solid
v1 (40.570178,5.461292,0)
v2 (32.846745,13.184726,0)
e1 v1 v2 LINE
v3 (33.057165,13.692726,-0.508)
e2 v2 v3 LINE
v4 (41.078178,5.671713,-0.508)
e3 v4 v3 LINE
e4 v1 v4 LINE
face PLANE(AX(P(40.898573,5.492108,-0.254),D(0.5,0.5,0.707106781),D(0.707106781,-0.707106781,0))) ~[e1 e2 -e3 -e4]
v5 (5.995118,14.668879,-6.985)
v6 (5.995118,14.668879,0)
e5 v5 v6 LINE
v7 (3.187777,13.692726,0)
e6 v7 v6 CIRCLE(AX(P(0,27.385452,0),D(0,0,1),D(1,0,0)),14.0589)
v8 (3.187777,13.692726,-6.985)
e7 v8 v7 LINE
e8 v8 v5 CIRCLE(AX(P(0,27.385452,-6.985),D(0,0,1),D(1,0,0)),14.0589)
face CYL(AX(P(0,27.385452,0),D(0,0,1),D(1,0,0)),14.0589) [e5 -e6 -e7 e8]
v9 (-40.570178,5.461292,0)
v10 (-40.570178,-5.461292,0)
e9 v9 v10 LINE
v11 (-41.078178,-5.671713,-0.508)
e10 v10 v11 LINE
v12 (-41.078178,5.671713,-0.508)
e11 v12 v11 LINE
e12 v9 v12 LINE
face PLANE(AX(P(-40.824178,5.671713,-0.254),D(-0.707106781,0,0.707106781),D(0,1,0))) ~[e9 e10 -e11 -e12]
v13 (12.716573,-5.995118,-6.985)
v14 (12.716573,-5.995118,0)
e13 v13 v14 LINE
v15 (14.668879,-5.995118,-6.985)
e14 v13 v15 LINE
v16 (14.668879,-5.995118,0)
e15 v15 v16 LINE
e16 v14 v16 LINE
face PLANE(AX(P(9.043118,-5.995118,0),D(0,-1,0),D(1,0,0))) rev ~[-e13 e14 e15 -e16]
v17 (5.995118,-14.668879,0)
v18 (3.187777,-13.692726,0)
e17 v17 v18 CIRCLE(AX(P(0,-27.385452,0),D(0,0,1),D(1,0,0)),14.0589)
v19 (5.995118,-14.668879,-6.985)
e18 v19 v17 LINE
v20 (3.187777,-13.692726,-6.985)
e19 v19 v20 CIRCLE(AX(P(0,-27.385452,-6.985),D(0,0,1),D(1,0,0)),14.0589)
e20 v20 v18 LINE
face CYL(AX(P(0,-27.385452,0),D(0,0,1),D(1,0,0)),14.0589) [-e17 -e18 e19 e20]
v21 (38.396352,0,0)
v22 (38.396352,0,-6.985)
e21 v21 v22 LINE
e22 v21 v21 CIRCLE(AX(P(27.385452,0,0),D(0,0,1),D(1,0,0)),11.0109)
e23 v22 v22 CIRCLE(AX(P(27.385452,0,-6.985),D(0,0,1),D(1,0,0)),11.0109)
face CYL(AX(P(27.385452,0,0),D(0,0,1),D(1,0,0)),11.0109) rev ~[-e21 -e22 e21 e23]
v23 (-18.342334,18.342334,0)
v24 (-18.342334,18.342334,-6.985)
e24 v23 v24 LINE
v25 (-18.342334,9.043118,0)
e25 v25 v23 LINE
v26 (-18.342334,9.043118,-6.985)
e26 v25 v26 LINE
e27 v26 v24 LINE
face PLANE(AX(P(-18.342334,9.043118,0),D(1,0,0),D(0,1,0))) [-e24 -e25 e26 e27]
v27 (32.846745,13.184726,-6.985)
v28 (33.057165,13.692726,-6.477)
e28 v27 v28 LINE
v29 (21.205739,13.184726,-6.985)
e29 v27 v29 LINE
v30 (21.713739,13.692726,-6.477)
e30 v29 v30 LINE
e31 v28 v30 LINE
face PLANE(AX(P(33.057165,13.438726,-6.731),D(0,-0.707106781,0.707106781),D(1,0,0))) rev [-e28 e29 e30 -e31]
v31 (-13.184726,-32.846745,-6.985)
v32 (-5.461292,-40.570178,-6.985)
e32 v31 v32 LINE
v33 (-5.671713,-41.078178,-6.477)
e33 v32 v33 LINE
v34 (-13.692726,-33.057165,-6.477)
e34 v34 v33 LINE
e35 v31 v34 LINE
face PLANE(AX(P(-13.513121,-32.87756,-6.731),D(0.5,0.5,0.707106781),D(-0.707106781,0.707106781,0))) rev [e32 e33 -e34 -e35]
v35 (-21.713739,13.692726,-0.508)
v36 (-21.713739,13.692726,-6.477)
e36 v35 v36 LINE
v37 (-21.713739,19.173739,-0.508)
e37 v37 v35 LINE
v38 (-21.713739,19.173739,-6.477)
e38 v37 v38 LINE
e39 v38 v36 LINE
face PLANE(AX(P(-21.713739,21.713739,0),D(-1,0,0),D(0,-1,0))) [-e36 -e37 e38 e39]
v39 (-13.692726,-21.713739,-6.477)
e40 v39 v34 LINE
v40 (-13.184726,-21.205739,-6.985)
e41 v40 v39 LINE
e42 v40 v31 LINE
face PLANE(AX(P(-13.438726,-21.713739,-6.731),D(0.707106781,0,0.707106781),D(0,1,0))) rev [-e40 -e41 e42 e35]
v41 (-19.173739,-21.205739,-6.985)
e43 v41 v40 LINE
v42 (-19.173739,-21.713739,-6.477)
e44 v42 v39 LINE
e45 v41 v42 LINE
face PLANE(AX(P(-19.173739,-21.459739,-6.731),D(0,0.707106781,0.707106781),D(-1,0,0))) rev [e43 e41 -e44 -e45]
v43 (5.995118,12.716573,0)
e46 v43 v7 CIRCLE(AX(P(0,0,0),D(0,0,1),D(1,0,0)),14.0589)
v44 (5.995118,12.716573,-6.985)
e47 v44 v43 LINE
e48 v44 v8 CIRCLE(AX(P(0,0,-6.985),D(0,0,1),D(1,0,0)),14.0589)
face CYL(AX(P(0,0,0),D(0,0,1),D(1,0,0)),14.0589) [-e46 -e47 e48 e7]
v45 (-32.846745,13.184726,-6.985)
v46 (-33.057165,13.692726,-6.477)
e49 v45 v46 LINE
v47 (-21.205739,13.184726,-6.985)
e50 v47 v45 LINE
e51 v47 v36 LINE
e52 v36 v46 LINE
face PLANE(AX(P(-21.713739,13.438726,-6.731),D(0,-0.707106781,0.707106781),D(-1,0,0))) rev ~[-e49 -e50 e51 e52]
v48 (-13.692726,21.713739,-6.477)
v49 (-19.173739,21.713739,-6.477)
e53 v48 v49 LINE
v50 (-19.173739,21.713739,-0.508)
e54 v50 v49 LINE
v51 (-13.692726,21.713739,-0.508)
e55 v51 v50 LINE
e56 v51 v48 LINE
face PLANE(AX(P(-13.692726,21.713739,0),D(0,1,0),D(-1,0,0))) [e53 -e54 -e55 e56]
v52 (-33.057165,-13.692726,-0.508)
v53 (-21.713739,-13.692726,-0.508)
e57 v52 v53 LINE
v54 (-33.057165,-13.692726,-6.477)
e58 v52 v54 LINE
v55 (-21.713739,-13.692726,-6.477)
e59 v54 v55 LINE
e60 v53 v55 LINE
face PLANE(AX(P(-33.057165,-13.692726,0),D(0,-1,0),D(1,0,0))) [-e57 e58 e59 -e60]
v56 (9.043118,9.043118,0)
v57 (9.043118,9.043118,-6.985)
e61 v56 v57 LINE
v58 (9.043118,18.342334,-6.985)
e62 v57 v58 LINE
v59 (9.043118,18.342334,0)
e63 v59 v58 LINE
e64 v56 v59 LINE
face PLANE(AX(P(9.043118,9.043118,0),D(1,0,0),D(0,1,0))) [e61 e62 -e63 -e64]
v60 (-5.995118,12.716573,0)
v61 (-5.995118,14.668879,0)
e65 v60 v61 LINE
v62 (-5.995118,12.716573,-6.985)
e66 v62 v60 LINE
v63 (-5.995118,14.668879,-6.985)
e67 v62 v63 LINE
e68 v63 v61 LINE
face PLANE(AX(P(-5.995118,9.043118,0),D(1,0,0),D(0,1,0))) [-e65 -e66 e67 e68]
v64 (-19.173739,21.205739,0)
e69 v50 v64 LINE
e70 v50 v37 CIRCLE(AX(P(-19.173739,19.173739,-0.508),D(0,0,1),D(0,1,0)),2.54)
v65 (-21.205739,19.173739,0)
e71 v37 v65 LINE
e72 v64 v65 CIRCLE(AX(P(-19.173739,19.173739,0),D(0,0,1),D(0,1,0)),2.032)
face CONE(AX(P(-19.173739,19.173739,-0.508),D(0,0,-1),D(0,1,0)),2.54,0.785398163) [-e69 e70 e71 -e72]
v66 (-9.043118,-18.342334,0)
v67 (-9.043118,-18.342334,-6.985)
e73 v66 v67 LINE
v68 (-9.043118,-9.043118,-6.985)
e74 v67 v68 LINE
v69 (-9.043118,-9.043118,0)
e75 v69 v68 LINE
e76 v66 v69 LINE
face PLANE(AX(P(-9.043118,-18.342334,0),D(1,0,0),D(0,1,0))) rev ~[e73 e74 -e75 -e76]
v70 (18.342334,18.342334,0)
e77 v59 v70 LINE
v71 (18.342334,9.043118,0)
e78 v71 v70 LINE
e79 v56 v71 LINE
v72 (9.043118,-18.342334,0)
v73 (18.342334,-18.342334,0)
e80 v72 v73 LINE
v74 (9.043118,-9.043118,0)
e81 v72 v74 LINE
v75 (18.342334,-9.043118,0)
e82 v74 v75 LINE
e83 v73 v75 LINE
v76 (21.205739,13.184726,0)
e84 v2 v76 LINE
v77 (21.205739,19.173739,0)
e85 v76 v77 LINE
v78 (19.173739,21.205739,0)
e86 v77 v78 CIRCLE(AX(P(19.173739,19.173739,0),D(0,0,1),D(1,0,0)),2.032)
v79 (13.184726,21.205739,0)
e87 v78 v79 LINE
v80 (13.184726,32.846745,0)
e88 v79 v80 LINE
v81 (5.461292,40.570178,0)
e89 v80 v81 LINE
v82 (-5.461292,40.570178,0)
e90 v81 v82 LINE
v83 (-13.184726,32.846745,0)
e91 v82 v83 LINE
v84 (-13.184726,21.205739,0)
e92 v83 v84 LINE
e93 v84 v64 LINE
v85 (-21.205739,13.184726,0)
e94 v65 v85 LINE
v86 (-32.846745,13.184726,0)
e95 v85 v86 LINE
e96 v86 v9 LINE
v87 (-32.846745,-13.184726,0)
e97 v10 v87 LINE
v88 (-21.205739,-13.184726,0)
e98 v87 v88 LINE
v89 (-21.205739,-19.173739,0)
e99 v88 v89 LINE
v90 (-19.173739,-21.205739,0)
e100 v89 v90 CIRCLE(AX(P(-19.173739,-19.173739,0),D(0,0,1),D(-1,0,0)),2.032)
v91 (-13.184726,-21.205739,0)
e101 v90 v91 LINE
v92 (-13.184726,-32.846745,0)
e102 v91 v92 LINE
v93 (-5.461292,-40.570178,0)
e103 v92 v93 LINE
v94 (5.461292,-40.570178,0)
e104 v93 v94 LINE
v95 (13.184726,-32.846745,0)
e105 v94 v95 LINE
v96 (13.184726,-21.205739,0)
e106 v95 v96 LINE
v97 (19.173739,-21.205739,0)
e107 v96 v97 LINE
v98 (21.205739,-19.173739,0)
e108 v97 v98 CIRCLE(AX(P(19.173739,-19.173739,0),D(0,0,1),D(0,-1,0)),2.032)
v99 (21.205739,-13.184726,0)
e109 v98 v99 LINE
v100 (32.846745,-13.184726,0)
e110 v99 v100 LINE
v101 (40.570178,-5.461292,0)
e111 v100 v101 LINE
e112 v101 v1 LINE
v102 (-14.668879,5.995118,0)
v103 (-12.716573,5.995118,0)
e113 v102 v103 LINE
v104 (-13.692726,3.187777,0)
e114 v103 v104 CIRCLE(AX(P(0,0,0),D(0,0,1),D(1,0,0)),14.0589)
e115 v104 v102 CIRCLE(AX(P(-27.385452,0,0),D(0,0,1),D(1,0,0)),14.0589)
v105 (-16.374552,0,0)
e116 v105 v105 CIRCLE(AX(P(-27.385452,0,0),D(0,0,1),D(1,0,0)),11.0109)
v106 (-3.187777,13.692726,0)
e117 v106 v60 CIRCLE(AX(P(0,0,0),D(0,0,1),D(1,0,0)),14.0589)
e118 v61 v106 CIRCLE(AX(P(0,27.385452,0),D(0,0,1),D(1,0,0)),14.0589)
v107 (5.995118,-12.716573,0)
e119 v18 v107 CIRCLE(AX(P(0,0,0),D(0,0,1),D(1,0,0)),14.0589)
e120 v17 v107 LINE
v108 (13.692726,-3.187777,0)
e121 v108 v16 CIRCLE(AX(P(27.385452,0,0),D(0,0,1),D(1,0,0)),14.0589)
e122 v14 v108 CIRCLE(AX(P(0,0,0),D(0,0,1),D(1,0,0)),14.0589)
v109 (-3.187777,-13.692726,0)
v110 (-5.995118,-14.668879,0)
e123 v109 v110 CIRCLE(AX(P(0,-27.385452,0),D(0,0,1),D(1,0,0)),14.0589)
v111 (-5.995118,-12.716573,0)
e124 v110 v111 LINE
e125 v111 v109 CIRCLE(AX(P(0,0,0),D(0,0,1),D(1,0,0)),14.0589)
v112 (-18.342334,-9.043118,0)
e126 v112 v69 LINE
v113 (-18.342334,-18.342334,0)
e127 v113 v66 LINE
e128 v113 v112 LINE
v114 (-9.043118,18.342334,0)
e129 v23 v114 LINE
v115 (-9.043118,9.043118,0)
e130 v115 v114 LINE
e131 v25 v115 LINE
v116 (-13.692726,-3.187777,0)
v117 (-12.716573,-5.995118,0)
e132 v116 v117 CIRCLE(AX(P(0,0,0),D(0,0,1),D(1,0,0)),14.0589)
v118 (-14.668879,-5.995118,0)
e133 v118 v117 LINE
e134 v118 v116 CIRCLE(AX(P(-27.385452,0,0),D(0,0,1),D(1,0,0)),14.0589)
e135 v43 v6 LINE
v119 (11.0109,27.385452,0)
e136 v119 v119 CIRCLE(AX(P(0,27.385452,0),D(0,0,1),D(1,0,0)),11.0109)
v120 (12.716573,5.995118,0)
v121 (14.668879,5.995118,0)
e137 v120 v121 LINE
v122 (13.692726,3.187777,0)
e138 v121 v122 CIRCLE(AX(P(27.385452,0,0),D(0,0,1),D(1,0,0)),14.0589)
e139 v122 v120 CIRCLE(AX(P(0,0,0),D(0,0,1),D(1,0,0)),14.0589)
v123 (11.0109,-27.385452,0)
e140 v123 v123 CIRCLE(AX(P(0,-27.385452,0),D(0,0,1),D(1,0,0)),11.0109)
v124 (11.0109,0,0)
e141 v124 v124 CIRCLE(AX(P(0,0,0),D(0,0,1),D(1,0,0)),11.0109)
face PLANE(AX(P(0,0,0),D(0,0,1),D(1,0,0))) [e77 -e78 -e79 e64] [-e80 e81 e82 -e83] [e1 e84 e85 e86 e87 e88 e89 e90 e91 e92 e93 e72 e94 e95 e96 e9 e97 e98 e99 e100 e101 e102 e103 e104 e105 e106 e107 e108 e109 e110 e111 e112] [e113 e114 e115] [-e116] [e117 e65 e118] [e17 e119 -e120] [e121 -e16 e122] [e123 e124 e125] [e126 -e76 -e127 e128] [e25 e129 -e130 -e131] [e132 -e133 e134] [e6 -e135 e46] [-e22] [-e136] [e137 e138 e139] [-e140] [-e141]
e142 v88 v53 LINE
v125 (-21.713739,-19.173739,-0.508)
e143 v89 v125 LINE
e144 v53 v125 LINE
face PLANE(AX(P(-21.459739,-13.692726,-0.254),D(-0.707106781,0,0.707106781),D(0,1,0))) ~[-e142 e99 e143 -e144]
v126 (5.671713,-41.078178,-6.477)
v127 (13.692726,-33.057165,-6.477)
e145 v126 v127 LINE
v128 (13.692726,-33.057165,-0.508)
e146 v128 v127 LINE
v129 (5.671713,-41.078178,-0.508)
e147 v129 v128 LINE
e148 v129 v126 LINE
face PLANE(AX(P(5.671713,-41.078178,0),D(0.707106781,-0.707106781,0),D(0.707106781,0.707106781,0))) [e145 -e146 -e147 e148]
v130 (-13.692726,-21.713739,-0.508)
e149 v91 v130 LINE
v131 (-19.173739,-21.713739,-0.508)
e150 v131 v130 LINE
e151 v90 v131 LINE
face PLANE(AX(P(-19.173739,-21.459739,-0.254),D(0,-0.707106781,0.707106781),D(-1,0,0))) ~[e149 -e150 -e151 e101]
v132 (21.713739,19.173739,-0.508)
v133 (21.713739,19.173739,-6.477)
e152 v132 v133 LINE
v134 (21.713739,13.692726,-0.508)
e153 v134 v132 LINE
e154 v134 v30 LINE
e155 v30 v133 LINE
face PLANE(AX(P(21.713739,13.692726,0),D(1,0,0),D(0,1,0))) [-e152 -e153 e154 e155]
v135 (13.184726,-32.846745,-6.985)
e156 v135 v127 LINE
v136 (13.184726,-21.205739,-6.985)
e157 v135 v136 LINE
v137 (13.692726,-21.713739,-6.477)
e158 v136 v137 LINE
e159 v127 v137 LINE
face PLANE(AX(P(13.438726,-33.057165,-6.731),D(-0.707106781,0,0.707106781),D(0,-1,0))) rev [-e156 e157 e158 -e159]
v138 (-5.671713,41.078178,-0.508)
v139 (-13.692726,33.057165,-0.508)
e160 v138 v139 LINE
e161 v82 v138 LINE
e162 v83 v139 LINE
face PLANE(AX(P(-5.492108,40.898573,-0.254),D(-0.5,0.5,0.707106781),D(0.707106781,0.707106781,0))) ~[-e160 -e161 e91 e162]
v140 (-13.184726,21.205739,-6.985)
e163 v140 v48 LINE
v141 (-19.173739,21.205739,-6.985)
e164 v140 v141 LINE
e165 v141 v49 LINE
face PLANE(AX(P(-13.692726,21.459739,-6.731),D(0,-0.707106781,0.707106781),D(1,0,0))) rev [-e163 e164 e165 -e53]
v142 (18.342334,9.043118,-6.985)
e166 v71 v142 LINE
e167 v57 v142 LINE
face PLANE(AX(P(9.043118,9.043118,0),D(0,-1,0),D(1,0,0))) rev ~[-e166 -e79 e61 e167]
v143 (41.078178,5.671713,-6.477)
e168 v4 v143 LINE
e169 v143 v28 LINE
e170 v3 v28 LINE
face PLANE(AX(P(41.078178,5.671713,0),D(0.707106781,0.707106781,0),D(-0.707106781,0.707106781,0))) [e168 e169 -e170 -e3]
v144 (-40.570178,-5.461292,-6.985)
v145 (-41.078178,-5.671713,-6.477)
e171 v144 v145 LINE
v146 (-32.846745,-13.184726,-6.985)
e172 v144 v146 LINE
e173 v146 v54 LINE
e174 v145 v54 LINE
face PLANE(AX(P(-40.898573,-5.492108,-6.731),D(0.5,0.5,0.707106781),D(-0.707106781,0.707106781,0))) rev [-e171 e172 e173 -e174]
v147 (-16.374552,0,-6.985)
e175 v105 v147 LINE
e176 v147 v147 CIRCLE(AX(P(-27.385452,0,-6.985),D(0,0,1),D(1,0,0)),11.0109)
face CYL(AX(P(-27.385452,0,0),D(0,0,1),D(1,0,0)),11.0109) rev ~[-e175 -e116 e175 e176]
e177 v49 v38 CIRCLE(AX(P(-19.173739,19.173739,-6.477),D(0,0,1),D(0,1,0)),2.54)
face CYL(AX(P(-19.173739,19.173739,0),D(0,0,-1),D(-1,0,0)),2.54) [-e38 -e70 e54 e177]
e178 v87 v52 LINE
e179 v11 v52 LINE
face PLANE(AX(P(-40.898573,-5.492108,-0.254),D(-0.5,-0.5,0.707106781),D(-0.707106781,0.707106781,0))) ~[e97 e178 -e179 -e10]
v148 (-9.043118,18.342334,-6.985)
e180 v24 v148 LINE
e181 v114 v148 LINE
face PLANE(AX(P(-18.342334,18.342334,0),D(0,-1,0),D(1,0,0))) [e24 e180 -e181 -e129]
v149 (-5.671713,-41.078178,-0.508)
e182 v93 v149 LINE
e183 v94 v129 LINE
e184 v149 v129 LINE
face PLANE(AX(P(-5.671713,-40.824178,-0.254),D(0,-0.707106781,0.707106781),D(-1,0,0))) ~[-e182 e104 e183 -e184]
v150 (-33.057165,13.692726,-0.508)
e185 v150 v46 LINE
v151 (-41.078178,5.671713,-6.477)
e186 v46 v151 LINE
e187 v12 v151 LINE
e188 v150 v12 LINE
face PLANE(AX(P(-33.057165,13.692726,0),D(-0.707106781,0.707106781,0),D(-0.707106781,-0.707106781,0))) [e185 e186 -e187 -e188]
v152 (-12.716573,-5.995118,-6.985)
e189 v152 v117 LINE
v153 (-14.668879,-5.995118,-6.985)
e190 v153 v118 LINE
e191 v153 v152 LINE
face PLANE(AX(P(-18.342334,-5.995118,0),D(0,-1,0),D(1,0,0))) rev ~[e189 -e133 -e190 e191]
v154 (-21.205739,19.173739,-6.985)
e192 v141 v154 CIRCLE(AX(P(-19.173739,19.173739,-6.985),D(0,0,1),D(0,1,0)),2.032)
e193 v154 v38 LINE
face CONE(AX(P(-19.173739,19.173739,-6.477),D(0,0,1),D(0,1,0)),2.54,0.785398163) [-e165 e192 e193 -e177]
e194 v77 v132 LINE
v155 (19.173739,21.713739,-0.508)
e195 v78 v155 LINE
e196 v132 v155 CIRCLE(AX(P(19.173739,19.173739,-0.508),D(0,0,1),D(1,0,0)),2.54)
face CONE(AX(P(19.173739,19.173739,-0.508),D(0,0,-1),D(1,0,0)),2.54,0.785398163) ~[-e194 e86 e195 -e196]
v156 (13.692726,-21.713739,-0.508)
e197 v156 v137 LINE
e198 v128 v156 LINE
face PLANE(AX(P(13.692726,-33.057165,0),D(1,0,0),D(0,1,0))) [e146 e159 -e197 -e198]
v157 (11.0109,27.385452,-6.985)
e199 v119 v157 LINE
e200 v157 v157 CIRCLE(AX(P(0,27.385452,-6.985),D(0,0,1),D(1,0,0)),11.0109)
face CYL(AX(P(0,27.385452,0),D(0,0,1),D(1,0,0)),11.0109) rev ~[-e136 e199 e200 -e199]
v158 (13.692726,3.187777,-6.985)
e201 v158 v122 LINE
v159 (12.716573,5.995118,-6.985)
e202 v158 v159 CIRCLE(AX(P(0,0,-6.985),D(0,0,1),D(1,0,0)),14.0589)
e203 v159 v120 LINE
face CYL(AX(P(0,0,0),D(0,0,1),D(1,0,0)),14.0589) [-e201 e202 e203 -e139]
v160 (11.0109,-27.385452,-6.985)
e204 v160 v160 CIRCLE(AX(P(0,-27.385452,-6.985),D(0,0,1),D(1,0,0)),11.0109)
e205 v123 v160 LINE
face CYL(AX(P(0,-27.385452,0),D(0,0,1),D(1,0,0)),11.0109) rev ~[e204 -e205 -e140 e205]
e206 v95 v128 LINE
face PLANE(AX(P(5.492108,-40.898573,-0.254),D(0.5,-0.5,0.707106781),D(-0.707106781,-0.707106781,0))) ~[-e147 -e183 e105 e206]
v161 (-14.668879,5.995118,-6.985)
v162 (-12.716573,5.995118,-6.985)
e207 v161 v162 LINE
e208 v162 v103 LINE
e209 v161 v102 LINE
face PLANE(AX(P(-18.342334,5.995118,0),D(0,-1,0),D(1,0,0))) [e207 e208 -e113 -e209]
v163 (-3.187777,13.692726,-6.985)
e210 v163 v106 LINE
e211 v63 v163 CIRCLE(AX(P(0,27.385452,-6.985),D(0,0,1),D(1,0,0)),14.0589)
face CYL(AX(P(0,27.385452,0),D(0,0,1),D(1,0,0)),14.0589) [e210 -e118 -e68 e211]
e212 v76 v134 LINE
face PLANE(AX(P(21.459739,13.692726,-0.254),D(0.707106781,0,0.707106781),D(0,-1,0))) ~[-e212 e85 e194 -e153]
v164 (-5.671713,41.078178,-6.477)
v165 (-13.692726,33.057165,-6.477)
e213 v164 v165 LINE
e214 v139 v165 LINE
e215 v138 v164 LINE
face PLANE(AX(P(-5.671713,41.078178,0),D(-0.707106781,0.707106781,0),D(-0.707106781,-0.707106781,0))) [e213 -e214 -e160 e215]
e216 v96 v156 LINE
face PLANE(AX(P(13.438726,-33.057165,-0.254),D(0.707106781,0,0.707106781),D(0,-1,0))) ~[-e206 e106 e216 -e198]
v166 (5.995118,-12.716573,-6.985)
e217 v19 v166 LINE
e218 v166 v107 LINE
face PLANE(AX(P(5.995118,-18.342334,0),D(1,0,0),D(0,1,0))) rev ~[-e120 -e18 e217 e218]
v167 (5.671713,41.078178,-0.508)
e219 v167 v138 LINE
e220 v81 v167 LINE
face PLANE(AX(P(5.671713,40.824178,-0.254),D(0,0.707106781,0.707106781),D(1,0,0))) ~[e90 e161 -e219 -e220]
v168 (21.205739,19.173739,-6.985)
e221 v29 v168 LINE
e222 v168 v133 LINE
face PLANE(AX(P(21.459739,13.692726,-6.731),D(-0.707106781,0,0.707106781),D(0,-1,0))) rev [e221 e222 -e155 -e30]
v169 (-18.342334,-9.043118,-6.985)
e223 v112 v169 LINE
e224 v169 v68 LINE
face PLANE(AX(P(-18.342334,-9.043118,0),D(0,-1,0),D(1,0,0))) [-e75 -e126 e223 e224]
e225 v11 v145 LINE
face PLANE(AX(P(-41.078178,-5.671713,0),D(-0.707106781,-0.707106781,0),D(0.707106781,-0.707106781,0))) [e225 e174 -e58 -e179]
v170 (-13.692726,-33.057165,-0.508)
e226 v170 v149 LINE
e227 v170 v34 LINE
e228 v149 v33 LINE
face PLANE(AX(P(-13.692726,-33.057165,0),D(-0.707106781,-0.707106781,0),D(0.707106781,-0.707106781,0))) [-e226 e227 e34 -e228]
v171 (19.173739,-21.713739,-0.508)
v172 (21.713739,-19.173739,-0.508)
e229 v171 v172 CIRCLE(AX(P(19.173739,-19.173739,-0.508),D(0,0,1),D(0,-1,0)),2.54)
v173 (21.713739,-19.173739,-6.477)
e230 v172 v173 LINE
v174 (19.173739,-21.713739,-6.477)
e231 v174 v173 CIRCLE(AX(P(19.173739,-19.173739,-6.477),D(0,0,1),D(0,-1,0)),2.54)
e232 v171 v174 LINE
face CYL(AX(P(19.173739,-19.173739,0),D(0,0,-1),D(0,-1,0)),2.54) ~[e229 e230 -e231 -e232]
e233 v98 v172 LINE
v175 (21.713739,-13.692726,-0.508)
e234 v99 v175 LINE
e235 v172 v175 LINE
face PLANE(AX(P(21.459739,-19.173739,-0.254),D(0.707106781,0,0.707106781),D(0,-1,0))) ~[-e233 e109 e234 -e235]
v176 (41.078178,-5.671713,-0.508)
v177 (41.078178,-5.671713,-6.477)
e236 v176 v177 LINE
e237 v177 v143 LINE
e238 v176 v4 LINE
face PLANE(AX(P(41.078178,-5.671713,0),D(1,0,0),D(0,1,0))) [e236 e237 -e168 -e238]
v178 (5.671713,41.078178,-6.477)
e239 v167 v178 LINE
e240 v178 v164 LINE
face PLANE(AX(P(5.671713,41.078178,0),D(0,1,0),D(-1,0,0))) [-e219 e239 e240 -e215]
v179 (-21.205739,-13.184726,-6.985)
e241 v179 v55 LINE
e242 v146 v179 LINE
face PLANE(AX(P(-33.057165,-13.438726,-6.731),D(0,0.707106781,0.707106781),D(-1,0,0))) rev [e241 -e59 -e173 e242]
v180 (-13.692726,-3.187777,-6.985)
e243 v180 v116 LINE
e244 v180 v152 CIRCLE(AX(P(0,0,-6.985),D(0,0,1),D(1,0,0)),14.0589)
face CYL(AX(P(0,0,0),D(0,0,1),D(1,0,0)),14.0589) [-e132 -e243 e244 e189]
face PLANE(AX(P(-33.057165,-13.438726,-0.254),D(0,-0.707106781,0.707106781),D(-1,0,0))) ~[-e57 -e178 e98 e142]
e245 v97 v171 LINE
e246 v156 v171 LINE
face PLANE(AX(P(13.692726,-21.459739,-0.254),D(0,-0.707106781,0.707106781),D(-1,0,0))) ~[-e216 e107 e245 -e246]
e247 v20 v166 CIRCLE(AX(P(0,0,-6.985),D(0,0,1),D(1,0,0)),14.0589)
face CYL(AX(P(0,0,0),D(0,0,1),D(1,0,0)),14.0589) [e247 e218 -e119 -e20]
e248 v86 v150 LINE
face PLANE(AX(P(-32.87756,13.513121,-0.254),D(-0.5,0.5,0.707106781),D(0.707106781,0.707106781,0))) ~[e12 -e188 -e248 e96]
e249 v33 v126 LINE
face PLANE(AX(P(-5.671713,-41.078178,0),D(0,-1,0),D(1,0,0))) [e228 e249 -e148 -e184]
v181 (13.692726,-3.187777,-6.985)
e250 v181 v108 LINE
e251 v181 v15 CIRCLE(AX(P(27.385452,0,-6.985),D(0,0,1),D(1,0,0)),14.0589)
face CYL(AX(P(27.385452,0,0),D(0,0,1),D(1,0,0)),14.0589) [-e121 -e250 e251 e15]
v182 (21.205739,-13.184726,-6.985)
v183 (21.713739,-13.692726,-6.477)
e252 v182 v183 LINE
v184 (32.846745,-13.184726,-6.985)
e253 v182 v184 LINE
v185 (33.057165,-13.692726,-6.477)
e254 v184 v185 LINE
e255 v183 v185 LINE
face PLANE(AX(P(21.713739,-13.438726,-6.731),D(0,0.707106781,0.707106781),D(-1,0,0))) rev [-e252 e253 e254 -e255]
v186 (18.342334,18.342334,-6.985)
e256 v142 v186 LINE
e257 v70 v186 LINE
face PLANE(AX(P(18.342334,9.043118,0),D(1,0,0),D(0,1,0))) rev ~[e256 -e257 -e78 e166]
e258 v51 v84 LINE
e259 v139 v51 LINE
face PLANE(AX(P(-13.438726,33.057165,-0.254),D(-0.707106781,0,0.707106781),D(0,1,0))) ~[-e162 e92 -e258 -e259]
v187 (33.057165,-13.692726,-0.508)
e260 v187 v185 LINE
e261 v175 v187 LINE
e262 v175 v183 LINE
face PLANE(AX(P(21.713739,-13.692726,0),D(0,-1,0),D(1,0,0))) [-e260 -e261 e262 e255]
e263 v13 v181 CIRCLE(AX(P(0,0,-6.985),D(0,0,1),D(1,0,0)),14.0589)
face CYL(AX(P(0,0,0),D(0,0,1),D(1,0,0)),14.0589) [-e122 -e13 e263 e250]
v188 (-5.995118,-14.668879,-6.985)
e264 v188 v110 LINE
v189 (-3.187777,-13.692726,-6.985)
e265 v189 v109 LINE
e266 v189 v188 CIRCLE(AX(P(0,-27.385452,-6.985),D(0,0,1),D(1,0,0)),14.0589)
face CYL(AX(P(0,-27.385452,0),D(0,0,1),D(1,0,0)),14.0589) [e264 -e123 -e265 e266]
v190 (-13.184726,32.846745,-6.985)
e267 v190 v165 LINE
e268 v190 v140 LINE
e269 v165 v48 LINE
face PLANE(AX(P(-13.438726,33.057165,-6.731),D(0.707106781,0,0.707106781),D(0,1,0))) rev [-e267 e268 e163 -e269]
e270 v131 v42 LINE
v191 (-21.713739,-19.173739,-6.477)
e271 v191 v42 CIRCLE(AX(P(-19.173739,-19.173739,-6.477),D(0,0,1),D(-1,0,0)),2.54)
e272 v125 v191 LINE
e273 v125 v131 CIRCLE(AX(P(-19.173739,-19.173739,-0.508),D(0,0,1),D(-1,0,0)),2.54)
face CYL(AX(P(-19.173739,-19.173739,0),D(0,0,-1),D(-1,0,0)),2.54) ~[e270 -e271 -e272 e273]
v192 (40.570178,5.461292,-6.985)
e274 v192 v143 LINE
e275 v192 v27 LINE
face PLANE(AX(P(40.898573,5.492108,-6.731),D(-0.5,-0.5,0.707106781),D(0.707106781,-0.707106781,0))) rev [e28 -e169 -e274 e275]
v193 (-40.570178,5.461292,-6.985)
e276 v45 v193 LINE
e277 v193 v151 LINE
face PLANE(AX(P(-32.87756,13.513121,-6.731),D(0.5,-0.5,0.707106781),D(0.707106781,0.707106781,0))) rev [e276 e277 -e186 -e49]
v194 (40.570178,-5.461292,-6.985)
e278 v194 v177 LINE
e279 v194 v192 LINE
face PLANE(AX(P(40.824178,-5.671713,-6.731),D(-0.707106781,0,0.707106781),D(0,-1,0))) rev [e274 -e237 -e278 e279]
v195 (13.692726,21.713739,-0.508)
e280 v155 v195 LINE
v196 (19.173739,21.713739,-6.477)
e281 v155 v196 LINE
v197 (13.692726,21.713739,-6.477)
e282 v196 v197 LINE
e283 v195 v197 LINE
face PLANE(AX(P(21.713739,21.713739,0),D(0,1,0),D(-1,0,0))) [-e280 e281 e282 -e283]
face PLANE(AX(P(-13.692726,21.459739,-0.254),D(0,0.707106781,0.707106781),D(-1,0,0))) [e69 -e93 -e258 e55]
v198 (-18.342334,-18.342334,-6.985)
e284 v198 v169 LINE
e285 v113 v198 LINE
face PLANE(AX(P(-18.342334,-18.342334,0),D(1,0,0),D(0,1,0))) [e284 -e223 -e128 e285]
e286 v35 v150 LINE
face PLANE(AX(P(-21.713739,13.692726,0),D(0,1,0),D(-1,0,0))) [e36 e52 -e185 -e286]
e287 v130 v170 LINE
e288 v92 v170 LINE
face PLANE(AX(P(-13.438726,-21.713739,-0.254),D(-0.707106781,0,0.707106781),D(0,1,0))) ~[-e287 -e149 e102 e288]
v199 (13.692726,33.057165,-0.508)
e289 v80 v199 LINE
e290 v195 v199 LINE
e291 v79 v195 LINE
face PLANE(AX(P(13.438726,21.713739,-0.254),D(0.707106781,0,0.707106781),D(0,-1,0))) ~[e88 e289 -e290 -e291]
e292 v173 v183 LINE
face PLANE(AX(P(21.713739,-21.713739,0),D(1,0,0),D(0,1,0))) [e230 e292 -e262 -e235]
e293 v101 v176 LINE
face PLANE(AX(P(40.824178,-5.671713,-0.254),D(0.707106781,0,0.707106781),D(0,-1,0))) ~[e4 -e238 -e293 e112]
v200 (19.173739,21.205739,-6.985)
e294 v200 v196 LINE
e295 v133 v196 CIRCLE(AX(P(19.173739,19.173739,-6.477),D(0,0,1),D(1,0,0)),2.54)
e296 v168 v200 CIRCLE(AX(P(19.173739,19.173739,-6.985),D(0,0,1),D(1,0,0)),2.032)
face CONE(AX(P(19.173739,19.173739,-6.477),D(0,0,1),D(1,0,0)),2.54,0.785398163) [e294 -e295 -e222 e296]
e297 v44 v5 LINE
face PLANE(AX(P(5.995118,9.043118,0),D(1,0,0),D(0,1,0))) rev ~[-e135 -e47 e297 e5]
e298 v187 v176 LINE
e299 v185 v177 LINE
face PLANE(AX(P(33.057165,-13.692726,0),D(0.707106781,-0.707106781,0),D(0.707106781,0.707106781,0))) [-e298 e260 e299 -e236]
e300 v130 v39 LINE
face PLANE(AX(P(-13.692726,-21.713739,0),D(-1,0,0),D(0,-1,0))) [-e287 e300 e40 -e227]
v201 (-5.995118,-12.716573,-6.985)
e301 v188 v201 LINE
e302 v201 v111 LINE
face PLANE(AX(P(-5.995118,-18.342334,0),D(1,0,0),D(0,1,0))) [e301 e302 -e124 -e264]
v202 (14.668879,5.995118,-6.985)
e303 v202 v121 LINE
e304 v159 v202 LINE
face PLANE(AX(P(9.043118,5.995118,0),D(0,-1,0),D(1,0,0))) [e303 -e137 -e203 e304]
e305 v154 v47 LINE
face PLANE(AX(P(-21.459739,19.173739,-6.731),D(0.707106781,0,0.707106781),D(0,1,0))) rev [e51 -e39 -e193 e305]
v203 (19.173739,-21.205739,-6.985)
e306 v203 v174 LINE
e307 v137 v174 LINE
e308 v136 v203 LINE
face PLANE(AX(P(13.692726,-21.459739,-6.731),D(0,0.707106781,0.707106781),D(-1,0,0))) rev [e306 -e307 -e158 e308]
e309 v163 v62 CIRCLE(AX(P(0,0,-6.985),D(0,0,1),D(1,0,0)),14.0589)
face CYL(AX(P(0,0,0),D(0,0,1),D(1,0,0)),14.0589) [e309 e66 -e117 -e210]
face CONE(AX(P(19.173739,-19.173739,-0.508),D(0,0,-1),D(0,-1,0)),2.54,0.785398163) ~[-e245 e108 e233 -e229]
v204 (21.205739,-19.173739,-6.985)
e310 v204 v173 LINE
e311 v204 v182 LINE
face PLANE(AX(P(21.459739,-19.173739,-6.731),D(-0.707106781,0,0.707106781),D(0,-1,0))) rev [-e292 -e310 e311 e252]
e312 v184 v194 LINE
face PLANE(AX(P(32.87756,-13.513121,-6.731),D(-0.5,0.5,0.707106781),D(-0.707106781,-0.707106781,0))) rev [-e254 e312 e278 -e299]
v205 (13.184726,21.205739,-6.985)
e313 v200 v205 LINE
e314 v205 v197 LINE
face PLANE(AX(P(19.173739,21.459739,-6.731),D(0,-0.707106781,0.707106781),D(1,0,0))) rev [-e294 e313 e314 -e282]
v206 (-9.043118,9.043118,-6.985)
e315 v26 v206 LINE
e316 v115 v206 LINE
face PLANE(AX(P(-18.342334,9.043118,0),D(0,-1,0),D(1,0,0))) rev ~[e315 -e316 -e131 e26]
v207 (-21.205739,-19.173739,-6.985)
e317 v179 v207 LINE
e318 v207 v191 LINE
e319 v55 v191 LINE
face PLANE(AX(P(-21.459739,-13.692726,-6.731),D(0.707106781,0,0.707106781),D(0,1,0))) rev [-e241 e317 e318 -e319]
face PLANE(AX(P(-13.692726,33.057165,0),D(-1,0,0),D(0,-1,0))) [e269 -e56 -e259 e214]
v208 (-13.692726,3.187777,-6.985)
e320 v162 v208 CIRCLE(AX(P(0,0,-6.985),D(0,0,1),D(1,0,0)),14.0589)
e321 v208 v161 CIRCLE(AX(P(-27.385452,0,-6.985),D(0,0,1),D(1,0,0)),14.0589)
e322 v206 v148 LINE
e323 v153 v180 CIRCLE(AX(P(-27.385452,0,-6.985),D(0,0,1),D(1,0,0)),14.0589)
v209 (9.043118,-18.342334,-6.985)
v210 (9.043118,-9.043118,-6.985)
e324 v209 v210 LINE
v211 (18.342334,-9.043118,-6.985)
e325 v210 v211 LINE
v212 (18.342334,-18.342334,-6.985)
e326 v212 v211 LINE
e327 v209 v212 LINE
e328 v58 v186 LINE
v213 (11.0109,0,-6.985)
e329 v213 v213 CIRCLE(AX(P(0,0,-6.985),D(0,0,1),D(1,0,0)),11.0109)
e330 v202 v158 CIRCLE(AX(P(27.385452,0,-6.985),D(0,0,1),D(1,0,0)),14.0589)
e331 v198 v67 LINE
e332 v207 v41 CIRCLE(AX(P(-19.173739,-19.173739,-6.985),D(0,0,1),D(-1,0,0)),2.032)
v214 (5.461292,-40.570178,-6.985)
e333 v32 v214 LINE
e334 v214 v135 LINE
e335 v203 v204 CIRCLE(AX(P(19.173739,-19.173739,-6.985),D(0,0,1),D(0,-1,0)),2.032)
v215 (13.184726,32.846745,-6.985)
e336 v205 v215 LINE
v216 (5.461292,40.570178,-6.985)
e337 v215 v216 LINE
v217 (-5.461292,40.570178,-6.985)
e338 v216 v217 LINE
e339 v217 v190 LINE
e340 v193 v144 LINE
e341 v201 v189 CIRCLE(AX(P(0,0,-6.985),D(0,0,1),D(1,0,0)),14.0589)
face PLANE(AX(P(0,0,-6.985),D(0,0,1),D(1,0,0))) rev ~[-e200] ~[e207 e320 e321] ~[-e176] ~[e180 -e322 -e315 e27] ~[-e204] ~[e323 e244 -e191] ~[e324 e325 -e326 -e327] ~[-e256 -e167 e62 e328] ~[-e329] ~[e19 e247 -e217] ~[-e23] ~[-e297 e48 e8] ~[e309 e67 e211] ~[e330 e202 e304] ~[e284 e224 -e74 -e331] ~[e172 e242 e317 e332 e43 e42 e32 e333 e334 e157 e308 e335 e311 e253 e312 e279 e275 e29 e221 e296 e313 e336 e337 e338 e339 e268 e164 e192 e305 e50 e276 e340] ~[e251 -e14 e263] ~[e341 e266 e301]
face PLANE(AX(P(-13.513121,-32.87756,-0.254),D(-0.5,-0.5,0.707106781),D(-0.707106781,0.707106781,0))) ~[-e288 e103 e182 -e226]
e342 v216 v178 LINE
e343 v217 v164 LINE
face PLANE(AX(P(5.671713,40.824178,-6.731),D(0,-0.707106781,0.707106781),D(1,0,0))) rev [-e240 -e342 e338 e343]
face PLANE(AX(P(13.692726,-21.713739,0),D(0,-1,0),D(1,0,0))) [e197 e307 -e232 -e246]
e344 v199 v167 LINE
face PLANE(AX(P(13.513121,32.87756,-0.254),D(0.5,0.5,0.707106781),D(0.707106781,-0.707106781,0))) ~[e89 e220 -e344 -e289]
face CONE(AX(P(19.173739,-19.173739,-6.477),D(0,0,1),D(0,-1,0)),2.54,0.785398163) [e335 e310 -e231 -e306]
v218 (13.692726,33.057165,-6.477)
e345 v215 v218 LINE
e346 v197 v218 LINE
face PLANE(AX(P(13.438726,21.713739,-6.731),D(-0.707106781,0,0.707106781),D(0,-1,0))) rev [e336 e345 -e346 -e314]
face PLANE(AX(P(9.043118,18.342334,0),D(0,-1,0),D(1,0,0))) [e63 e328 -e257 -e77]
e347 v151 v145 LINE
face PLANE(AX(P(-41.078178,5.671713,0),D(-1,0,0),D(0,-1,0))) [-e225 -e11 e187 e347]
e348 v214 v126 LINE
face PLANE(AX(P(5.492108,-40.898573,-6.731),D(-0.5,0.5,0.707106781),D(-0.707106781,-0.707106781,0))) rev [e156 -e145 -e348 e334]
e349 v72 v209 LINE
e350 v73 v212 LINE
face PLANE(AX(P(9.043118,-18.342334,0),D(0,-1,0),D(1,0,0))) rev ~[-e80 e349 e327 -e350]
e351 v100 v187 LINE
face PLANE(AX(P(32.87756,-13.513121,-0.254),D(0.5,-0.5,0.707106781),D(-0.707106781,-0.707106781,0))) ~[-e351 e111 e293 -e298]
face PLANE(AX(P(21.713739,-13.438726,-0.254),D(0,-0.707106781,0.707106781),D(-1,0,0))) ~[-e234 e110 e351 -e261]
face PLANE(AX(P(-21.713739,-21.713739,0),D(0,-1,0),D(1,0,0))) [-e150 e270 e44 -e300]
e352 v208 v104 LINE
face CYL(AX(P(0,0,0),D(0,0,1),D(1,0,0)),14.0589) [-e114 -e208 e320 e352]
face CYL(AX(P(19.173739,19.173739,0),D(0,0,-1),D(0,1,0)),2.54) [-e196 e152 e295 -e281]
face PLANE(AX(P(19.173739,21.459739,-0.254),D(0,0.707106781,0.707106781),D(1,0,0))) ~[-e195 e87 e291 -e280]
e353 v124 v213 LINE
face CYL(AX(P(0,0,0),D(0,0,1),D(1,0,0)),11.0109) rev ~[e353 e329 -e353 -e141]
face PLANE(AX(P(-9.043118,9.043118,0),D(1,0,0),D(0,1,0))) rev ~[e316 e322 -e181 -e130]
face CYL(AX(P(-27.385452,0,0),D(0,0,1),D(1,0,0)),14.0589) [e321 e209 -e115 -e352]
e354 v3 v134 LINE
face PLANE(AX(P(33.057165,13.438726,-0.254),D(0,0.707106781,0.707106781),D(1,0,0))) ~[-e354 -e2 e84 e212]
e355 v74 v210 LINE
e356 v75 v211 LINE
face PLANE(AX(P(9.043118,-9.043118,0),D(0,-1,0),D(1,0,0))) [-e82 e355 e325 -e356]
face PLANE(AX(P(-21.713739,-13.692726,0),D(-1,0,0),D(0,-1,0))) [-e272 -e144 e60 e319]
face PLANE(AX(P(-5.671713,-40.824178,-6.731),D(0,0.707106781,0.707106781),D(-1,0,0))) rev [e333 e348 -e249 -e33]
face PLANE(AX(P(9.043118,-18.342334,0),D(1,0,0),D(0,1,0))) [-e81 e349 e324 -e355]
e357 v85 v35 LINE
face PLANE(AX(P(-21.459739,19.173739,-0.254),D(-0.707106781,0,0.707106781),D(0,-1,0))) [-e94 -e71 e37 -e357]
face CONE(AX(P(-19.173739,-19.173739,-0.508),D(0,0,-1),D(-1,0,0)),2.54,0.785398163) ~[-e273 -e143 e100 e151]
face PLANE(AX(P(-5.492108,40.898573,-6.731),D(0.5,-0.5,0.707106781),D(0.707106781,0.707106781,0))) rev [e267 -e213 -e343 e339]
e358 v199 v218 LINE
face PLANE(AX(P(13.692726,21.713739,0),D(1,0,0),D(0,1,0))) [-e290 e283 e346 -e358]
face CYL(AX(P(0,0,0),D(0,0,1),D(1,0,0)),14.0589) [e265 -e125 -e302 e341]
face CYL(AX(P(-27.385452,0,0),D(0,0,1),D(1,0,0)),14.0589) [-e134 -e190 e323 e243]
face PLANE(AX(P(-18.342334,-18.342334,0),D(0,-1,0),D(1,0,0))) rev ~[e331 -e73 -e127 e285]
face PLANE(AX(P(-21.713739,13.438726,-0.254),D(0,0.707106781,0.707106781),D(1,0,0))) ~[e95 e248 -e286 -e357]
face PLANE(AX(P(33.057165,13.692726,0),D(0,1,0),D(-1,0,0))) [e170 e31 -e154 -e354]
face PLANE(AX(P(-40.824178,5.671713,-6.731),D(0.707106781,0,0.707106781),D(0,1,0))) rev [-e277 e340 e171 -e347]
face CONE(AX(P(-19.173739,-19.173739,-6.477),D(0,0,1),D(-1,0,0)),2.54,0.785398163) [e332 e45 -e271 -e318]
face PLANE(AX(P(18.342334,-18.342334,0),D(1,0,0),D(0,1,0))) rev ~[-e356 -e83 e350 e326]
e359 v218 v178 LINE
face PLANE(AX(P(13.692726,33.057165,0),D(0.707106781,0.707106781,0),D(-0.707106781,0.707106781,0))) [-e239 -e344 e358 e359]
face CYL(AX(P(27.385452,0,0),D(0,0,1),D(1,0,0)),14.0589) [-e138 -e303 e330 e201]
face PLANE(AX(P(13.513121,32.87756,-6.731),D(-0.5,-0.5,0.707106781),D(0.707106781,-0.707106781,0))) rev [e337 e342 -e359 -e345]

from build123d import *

# Parameters (mm, degrees)
F0_R         = 11.0109
F1_DEPTH     = 6.985
F2_W         = 9.299216499
F2_H         = 9.299216499
F3_DEPTH     = 25.4
F4_R         = 2.54
F5_SIZE      = 0.508
F6_SIZE      = 0.508
F7_T         = 3.048
F7_T3_DEPTH  = 12.065
F7_T5_DEPTH  = 6.9758818102
F7_T7_DEPTH  = 6.9758818102
F7_T9_DEPTH  = 6.9758818102
F7_T11_DEPTH = 6.9758818102
F7_T13_DEPTH = 6.9758818102
F7_T15_DEPTH = 13.081
F7_T17_DEPTH = 6.9758818102
F7_T19_DEPTH = 6.9758818102
F7_T21_DEPTH = 6.9758818102


# Not quite as in the source:
# - a shell that OpenCascade refuses in one call is made with other operations: the cavity is built on its own and cut out


with BuildPart() as f1:
    # F0 (on Top) → F1 (new body)
    with BuildSketch(Plane.XY):
        Polygon((-13.6927261634, 5.6717128827), (-13.6927261634, -5.6717128827), (-21.7137394441, -13.6927261634), (-21.7137394441, -21.7137394441), (-13.6927261634, -21.7137394441), (-5.6717128827, -13.6927261634), (5.6717128827, -13.6927261634), (13.6927261634, -21.7137394441), (21.7137394441, -21.7137394441), (21.7137394441, -13.6927261634), (13.6927261634, -5.6717128827), (13.6927261634, 5.6717128827), (21.7137394441, 13.6927261634), (21.7137394441, 21.7137394441), (13.6927261634, 21.7137394441), (5.6717128827, 13.6927261634), (-5.6717128827, 13.6927261634), (-13.6927261634, 21.7137394441), (-21.7137394441, 21.7137394441), (-21.7137394441, 13.6927261634), align=None)
        Circle(F0_R, mode=Mode.SUBTRACT)
        Polygon((-21.7137394441, -13.6927261634), (-13.6927261634, -5.6717128827), (-13.6927261634, 5.6717128827), (-21.7137394441, 13.6927261634), (-33.0571652095, 13.6927261634), (-41.0781784902, 5.6717128827), (-41.0781784902, -5.6717128827), (-33.0571652095, -13.6927261634), align=None)
        with Locations((-27.3854523268, 0)):
            Circle(F0_R, mode=Mode.SUBTRACT)
        Polygon((-5.6717128827, -13.6927261634), (-13.6927261634, -21.7137394441), (-13.6927261634, -33.0571652095), (-5.6717128827, -41.0781784902), (5.6717128827, -41.0781784902), (13.6927261634, -33.0571652095), (13.6927261634, -21.7137394441), (5.6717128827, -13.6927261634), align=None)
        with Locations((0, -27.3854523268)):
            Circle(F0_R, mode=Mode.SUBTRACT)
        Polygon((-13.6927261634, 33.0571652095), (-13.6927261634, 21.7137394441), (-5.6717128827, 13.6927261634), (5.6717128827, 13.6927261634), (13.6927261634, 21.7137394441), (13.6927261634, 33.0571652095), (5.6717128827, 41.0781784902), (-5.6717128827, 41.0781784902), align=None)
        with Locations((0, 27.3854523268)):
            Circle(F0_R, mode=Mode.SUBTRACT)
        Polygon((13.6927261634, -5.6717128827), (21.7137394441, -13.6927261634), (33.0571652095, -13.6927261634), (41.0781784902, -5.6717128827), (41.0781784902, 5.6717128827), (33.0571652095, 13.6927261634), (21.7137394441, 13.6927261634), (13.6927261634, 5.6717128827), align=None)
        with Locations((27.3854523268, 0)):
            Circle(F0_R, mode=Mode.SUBTRACT)
    extrude(amount=-F1_DEPTH)

    # F2 (on Top) → F3 (cut)
    with BuildSketch(Plane.XY):
        with Locations((-13.6927261634, 13.6927261634)):
            Rectangle(F2_W, F2_H)
        with Locations((13.6927261634, 13.6927261634)):
            Rectangle(F2_W, F2_H)
        with Locations((13.6927261634, -13.6927261634)):
            Rectangle(F2_W, F2_H)
        with Locations((-13.6927261634, -13.6927261634)):
            Rectangle(F2_W, F2_H)
    extrude(amount=-F3_DEPTH, mode=Mode.SUBTRACT)

    # F4
    f4_edges = [f1.edges().sort_by_distance(p)[0] for p in [
        (-21.713739, 21.713739, -3.4925),
        (21.713739, 21.713739, -3.4925),
        (21.713739, -21.713739, -3.4925),
        (-21.713739, -21.713739, -3.4925),
    ]]
    fillet(f4_edges, radius=F4_R)

    # F5
    f5_edges = [f1.edges().sort_by_distance(p)[0] for p in [
        (41.078178, 0, -6.985),
        (37.067672, 9.68222, -6.985),
        (27.385452, 13.692726, -6.985),
        (21.713739, 16.433233, -6.985),
        (16.433233, 21.713739, -6.985),
        (13.692726, 27.385452, -6.985),
        (9.68222, 37.067672, -6.985),
        (0, 41.078178, -6.985),
        (-9.68222, 37.067672, -6.985),
        (-13.692726, 27.385452, -6.985),
        (-16.433233, 21.713739, -6.985),
        (37.067672, -9.68222, -6.985),
        (27.385452, -13.692726, -6.985),
        (21.713739, -16.433233, -6.985),
        (16.433233, -21.713739, -6.985),
        (13.692726, -27.385452, -6.985),
        (9.68222, -37.067672, -6.985),
        (0, -41.078178, -6.985),
        (-9.68222, -37.067672, -6.985),
        (-13.692726, -27.385452, -6.985),
        (-16.433233, -21.713739, -6.985),
        (-21.713739, -16.433233, -6.985),
        (-27.385452, -13.692726, -6.985),
        (-37.067672, -9.68222, -6.985),
        (-41.078178, 0, -6.985),
        (-37.067672, 9.68222, -6.985),
        (-27.385452, 13.692726, -6.985),
        (-21.713739, 16.433233, -6.985),
    ]]
    chamfer(f5_edges, length=F5_SIZE)

    # F6
    f6_edges = [f1.edges().sort_by_distance(p)[0] for p in [
        (9.68222, -37.067672, 0),
        (0, -41.078178, 0),
        (-9.68222, -37.067672, 0),
        (-13.692726, -27.385452, 0),
        (-16.433233, -21.713739, 0),
        (-21.713739, -16.433233, 0),
        (-27.385452, -13.692726, 0),
        (-37.067672, -9.68222, 0),
        (-27.385452, 13.692726, 0),
        (-37.067672, 9.68222, 0),
        (-41.078178, 0, 0),
        (-21.713739, 16.433233, 0),
        (-16.433233, 21.713739, 0),
        (-13.692726, 27.385452, 0),
        (-9.68222, 37.067672, 0),
        (0, 41.078178, 0),
        (9.68222, 37.067672, 0),
        (13.692726, 27.385452, 0),
        (16.433233, 21.713739, 0),
        (21.713739, 16.433233, 0),
        (27.385452, 13.692726, 0),
        (37.067672, 9.68222, 0),
        (41.078178, 0, 0),
        (37.067672, -9.68222, 0),
        (27.385452, -13.692726, 0),
        (21.713739, -16.433233, 0),
        (16.433233, -21.713739, 0),
        (13.692726, -27.385452, 0),
    ]]
    chamfer(f6_edges, length=F6_SIZE)

    # F7: shell of thickness 3.048, made by hand


with BuildPart() as f7_core1:
    # F7_t2: copy of F1
    add(f1.part)

    # the walls: a layer under each face that stays
    f7_faces = [f7_core1.faces().sort_by_distance(p)[0] for p in [
        (21.7137394441, 16.4332328037, -3.4925),
        (21.4597394441, 16.1792328037, -0.254),
        (21.4597394441, 16.1792328037, -6.731),
        (27.3854523268, 13.6927261634, -3.4925),
        (20.7901855458, 20.7901855458, -0.254),
        (20.7901855458, 20.7901855458, -6.731),
        (16.4332328037, 21.7137394441, -3.4925),
        (27.1314523268, 13.4387261634, -0.254),
        (27.1314523268, 13.4387261634, -6.731),
        (37.0676718499, 9.6822195231, -3.4925),
        (16.1792328037, 21.4597394441, -0.254),
        (16.1792328037, 21.4597394441, -6.731),
        (13.6927261634, 27.3854523268, -3.4925),
        (36.8880667274, 9.5026144006, -0.254),
        (9.5026144006, -36.8880667274, -0.254),
        (0, -40.8241784902, -0.254),
        (13.4387261634, -27.1314523268, -0.254),
        (-9.5026144006, -36.8880667274, -0.254),
        (16.1792328037, -21.4597394441, -0.254),
        (-13.4387261634, -27.1314523268, -0.254),
        (20.7901855458, -20.7901855458, -0.254),
        (-16.1792328037, -21.4597394441, -0.254),
        (21.4597394441, -16.1792328037, -0.254),
        (-20.7901855458, -20.7901855458, -0.254),
        (27.1314523268, -13.4387261634, -0.254),
        (-21.4597394441, -16.1792328037, -0.254),
        (36.8880667274, -9.5026144006, -0.254),
        (-27.1314523268, -13.4387261634, -0.254),
        (40.8241784902, 0, -0.254),
        (-36.8880667274, -9.5026144006, -0.254),
        (-40.8241784902, 0, -0.254),
        (-36.8880667274, 9.5026144006, -0.254),
        (-27.1314523268, 13.4387261634, -0.254),
        (-21.4597394441, 16.1792328037, -0.254),
        (-20.7901855458, 20.7901855458, -0.254),
        (13.4387261634, 27.1314523268, -0.254),
        (-16.1792328037, 21.4597394441, -0.254),
        (9.5026144006, 36.8880667274, -0.254),
        (-13.4387261634, 27.1314523268, -0.254),
        (0, 40.8241784902, -0.254),
        (-9.5026144006, 36.8880667274, -0.254),
        (-9.0431179139, -13.6927261634, -3.4925),
        (-13.6927261634, -9.0431179139, -3.4925),
        (-18.3423344129, -13.6927261634, -3.4925),
        (-13.6927261634, -18.3423344129, -3.4925),
        (-11.0109, -27.3854523268, -3.4925),
        (18.3423344129, -13.6927261634, -3.4925),
        (13.6927261634, -9.0431179139, -3.4925),
        (9.0431179139, -13.6927261634, -3.4925),
        (13.6927261634, -18.3423344129, -3.4925),
        (-38.3963523268, 0, -3.4925),
        (-13.6927261634, 18.3423344129, -3.4925),
        (-18.3423344129, 13.6927261634, -3.4925),
        (-13.6927261634, 9.0431179139, -3.4925),
        (-9.0431179139, 13.6927261634, -3.4925),
        (-11.0109, 0, -3.4925),
        (9.0431179139, 13.6927261634, -3.4925),
        (13.6927261634, 9.0431179139, -3.4925),
        (18.3423344129, 13.6927261634, -3.4925),
        (13.6927261634, 18.3423344129, -3.4925),
        (16.3745523268, 0, -3.4925),
        (-11.0109, 27.3854523268, -3.4925),
        (36.8880667274, 9.5026144006, -6.731),
        (40.8241784902, 0, -6.731),
        (36.8880667274, -9.5026144006, -6.731),
        (27.1314523268, -13.4387261634, -6.731),
        (21.4597394441, -16.1792328037, -6.731),
        (20.7901855458, -20.7901855458, -6.731),
        (16.1792328037, -21.4597394441, -6.731),
        (13.4387261634, -27.1314523268, -6.731),
        (13.4387261634, 27.1314523268, -6.731),
        (9.5026144006, -36.8880667274, -6.731),
        (9.5026144006, 36.8880667274, -6.731),
        (0, -40.8241784902, -6.731),
        (0, 40.8241784902, -6.731),
        (-9.5026144006, -36.8880667274, -6.731),
        (-9.5026144006, 36.8880667274, -6.731),
        (-13.4387261634, -27.1314523268, -6.731),
        (-13.4387261634, 27.1314523268, -6.731),
        (-16.1792328037, -21.4597394441, -6.731),
        (-16.1792328037, 21.4597394441, -6.731),
        (-20.7901855458, -20.7901855458, -6.731),
        (-20.7901855458, 20.7901855458, -6.731),
        (-21.4597394441, -16.1792328037, -6.731),
        (-21.4597394441, 16.1792328037, -6.731),
        (-27.1314523268, -13.4387261634, -6.731),
        (-27.1314523268, 13.4387261634, -6.731),
        (-36.8880667274, -9.5026144006, -6.731),
        (-36.8880667274, 9.5026144006, -6.731),
        (-40.8241784902, 0, -6.731),
        (41.0781784902, 0, -3.4925),
        (9.6822195231, 37.0676718499, -3.4925),
        (9.6822195231, -37.0676718499, -3.4925),
        (0, -41.0781784902, -3.4925),
        (13.6927261634, -27.3854523268, -3.4925),
        (-9.6822195231, -37.0676718499, -3.4925),
        (16.4332328037, -21.7137394441, -3.4925),
        (-13.6927261634, -27.3854523268, -3.4925),
        (-16.4332328037, -21.7137394441, -3.4925),
        (21.7137394441, -16.4332328037, -3.4925),
        (27.3854523268, -13.6927261634, -3.4925),
        (-21.7137394441, -16.4332328037, -3.4925),
        (37.0676718499, -9.6822195231, -3.4925),
        (-27.3854523268, -13.6927261634, -3.4925),
        (-37.0676718499, -9.6822195231, -3.4925),
        (-41.0781784902, 0, -3.4925),
        (-37.0676718499, 9.6822195231, -3.4925),
        (-27.3854523268, 13.6927261634, -3.4925),
        (-21.7137394441, 16.4332328037, -3.4925),
        (-16.4332328037, 21.7137394441, -3.4925),
        (-13.6927261634, 27.3854523268, -3.4925),
        (0, 41.0781784902, -3.4925),
        (-9.6822195231, 37.0676718499, -3.4925),
    ]]
    thicken(f7_faces, amount=-F7_T, mode=Mode.SUBTRACT)

    # F7_s4 → F7_t3 (cut)
    with BuildSketch(Plane.XY.offset(-9.525)):
        Polygon((21.7442194441, 13.7232061634), (18.6657394441, 13.6927261634), (18.6657394441, 10.6447261634), (21.7137394441, 10.6447261634), align=None)
        Polygon((13.7232061634, 21.7442194441), (13.6927261634, 18.6657394441), (10.6447261634, 18.6657394441), (10.6447261634, 21.7137394441), align=None)
        Polygon((13.7232061634, -21.7442194441), (10.6447261634, -21.7137394441), (10.6447261634, -18.6657394441), (13.6927261634, -18.6657394441), align=None)
        Polygon((-13.7232061634, -21.7442194441), (-10.6447261634, -21.7137394441), (-10.6447261634, -18.6657394441), (-13.6927261634, -18.6657394441), align=None)
        Polygon((21.7442194441, -13.7232061634), (18.6657394441, -13.6927261634), (18.6657394441, -10.6447261634), (21.7137394441, -10.6447261634), align=None)
        Polygon((-21.7442194441, -13.7232061634), (-18.6657394441, -13.6927261634), (-18.6657394441, -10.6447261634), (-21.7137394441, -10.6447261634), align=None)
        Polygon((-21.7442194441, 13.7232061634), (-21.7137394441, 10.6447261634), (-18.6657394441, 10.6447261634), (-18.6657394441, 13.6927261634), align=None)
        Polygon((-13.7232061634, 21.7442194441), (-13.6927261634, 18.6657394441), (-10.6447261634, 18.6657394441), (-10.6447261634, 21.7137394441), align=None)
    extrude(amount=F7_T3_DEPTH, mode=Mode.SUBTRACT)

    # F7_s6 → F7_t5 (cut)
    with BuildSketch(Plane(origin=(9.7037249153, 9.7037249153, -9.7037249153), x_dir=(-0.7071067812, 0.7071067812, 0), z_dir=(0.5773502692, 0.5773502692, -0.5773502692))):
        Polygon((-5.6717128827, 14.0926417011), (-4.1477128827, 11.4002033618), (-5.6717128827, 10.5203215515), (-7.1957128827, 11.4002033618), align=None)
        Polygon((5.6717128827, 14.0926417011), (4.1477128827, 11.4002033618), (5.6717128827, 10.5203215515), (7.1957128827, 11.4002033618), align=None)
    extrude(amount=F7_T5_DEPTH, mode=Mode.SUBTRACT)

    # F7_s8 → F7_t7 (cut)
    with BuildSketch(Plane(origin=(11.402918823, 11.402918823, 11.402918823), x_dir=(0.7071067812, -0.7071067812, 0), z_dir=(-0.5773502692, -0.5773502692, -0.5773502692))):
        Polygon((5.6717128827, -19.7958703189), (4.1477128827, -17.1034319795), (5.6717128827, -16.2235501693), (7.1957128827, -17.1034319795), align=None)
        Polygon((-5.6717128827, -19.7958703189), (-4.1477128827, -17.1034319795), (-5.6717128827, -16.2235501693), (-7.1957128827, -17.1034319795), align=None)
    extrude(amount=F7_T7_DEPTH, mode=Mode.SUBTRACT)

    # F7_s10 → F7_t9 (cut)
    with BuildSketch(Plane(origin=(9.7037249153, -9.7037249153, -9.7037249153), x_dir=(0.7071067812, 0.7071067812, 0), z_dir=(0.5773502692, -0.5773502692, -0.5773502692))):
        Polygon((-5.6717128827, 14.0926417011), (-7.1957128827, 11.4002033618), (-5.6717128827, 10.5203215515), (-4.1477128827, 11.4002033618), align=None)
        Polygon((5.6717128827, 14.0926417011), (4.1477128827, 11.4002033618), (5.6717128827, 10.5203215515), (7.1957128827, 11.4002033618), align=None)
    extrude(amount=F7_T9_DEPTH, mode=Mode.SUBTRACT)

    # F7_s12 → F7_t11 (cut)
    with BuildSketch(Plane(origin=(-9.7037249153, -9.7037249153, -9.7037249153), x_dir=(0.7071067812, -0.7071067812, 0), z_dir=(-0.5773502692, -0.5773502692, -0.5773502692))):
        Polygon((5.6717128827, 14.0926417011), (7.1957128827, 11.4002033618), (5.6717128827, 10.5203215515), (4.1477128827, 11.4002033618), align=None)
        Polygon((-5.6717128827, 14.0926417011), (-4.1477128827, 11.4002033618), (-5.6717128827, 10.5203215515), (-7.1957128827, 11.4002033618), align=None)
    extrude(amount=F7_T11_DEPTH, mode=Mode.SUBTRACT)

    # F7_s14 → F7_t13 (cut)
    with BuildSketch(Plane(origin=(-9.7037249153, 9.7037249153, -9.7037249153), x_dir=(-0.7071067812, -0.7071067812, 0), z_dir=(-0.5773502692, 0.5773502692, -0.5773502692))):
        Polygon((5.6717128827, 14.0926417011), (7.1957128827, 11.4002033618), (5.6717128827, 10.5203215515), (4.1477128827, 11.4002033618), align=None)
        Polygon((-5.6717128827, 14.0926417011), (-4.1477128827, 11.4002033618), (-5.6717128827, 10.5203215515), (-7.1957128827, 11.4002033618), align=None)
    extrude(amount=F7_T13_DEPTH, mode=Mode.SUBTRACT)

    # F7_s16 → F7_t15 (cut)
    with BuildSketch(Plane.XY.offset(-10.033)):
        Polygon((-9.0735979139, -9.0735979139), (-5.9951179139, -9.0431179139), (-5.9951179139, -5.9951179139), (-9.0431179139, -5.9951179139), align=None)
        Polygon((-9.0735979139, -18.3118544129), (-5.9951179139, -18.3423344129), (-5.9951179139, -21.3903344129), (-9.0431179139, -21.3903344129), align=None)
        Polygon((-18.3118544129, -9.0735979139), (-18.3423344129, -5.9951179139), (-21.3903344129, -5.9951179139), (-21.3903344129, -9.0431179139), align=None)
        Polygon((-18.3118544129, -18.3118544129), (-21.3903344129, -18.3423344129), (-21.3903344129, -21.3903344129), (-18.3423344129, -21.3903344129), align=None)
        Polygon((18.3118544129, -9.0735979139), (21.3903344129, -9.0431179139), (21.3903344129, -5.9951179139), (18.3423344129, -5.9951179139), align=None)
        Polygon((18.3118544129, -18.3118544129), (21.3903344129, -18.3423344129), (21.3903344129, -21.3903344129), (18.3423344129, -21.3903344129), align=None)
        Polygon((9.0735979139, -9.0735979139), (9.0431179139, -5.9951179139), (5.9951179139, -5.9951179139), (5.9951179139, -9.0431179139), align=None)
        Polygon((9.0735979139, -18.3118544129), (5.9951179139, -18.3423344129), (5.9951179139, -21.3903344129), (9.0431179139, -21.3903344129), align=None)
        Polygon((-18.3118544129, 18.3118544129), (-18.3423344129, 21.3903344129), (-21.3903344129, 21.3903344129), (-21.3903344129, 18.3423344129), align=None)
        Polygon((-9.0735979139, 18.3118544129), (-9.0431179139, 21.3903344129), (-5.9951179139, 21.3903344129), (-5.9951179139, 18.3423344129), align=None)
        Polygon((-18.3118544129, 9.0735979139), (-21.3903344129, 9.0431179139), (-21.3903344129, 5.9951179139), (-18.3423344129, 5.9951179139), align=None)
        Polygon((-9.0735979139, 9.0735979139), (-9.0431179139, 5.9951179139), (-5.9951179139, 5.9951179139), (-5.9951179139, 9.0431179139), align=None)
        Polygon((9.0735979139, 9.0735979139), (5.9951179139, 9.0431179139), (5.9951179139, 5.9951179139), (9.0431179139, 5.9951179139), align=None)
        Polygon((9.0735979139, 18.3118544129), (5.9951179139, 18.3423344129), (5.9951179139, 21.3903344129), (9.0431179139, 21.3903344129), align=None)
        Polygon((18.3118544129, 9.0735979139), (18.3423344129, 5.9951179139), (21.3903344129, 5.9951179139), (21.3903344129, 9.0431179139), align=None)
        Polygon((18.3118544129, 18.3118544129), (21.3903344129, 18.3423344129), (21.3903344129, 21.3903344129), (18.3423344129, 21.3903344129), align=None)
    extrude(amount=F7_T15_DEPTH, mode=Mode.SUBTRACT)

    # F7_s18 → F7_t17 (cut)
    with BuildSketch(Plane(origin=(7.375391582, -7.375391582, 7.375391582), x_dir=(0.7071067812, 0.7071067812, 0), z_dir=(0.5773502692, -0.5773502692, 0.5773502692))):
        Polygon((5.6717128827, -19.7958703189), (7.1957128827, -17.1034319795), (5.6717128827, -16.2235501693), (4.1477128827, -17.1034319795), align=None)
        Polygon((-5.6717128827, -19.7958703189), (-4.1477128827, -17.1034319795), (-5.6717128827, -16.2235501693), (-7.1957128827, -17.1034319795), align=None)
    extrude(amount=F7_T17_DEPTH, mode=Mode.SUBTRACT)

    # F7_s20 → F7_t19 (cut)
    with BuildSketch(Plane(origin=(-7.375391582, -7.375391582, 7.375391582), x_dir=(0.7071067812, -0.7071067812, 0), z_dir=(-0.5773502692, -0.5773502692, 0.5773502692))):
        Polygon((5.6717128827, -19.7958703189), (7.1957128827, -17.1034319795), (5.6717128827, -16.2235501693), (4.1477128827, -17.1034319795), align=None)
        Polygon((-5.6717128827, -19.7958703189), (-4.1477128827, -17.1034319795), (-5.6717128827, -16.2235501693), (-7.1957128827, -17.1034319795), align=None)
    extrude(amount=F7_T19_DEPTH, mode=Mode.SUBTRACT)

    # F7_s22 → F7_t21 (cut)
    with BuildSketch(Plane(origin=(-7.375391582, 7.375391582, 7.375391582), x_dir=(-0.7071067812, -0.7071067812, 0), z_dir=(-0.5773502692, 0.5773502692, 0.5773502692))):
        Polygon((-5.6717128827, -19.7958703189), (-7.1957128827, -17.1034319795), (-5.6717128827, -16.2235501693), (-4.1477128827, -17.1034319795), align=None)
        Polygon((5.6717128827, -19.7958703189), (4.1477128827, -17.1034319795), (5.6717128827, -16.2235501693), (7.1957128827, -17.1034319795), align=None)
    extrude(amount=F7_T21_DEPTH, mode=Mode.SUBTRACT)


with BuildPart() as f1_1:
    add(f1.part)

    # what is left inside the walls is the cavity
    f7_cavity = [f7_core1.part.solids().sort_by_distance(p)[0] for p in [
        (13.307835, 4.627326, -4.656667),
        (4.627326, 14.077617, -4.656667),
        (-4.627326, 13.307835, -4.656667),
        (14.077617, -4.627326, -4.656667),
        (4.627326, -14.077617, -4.656667),
        (-4.627326, -13.307835, -4.656667),
        (-14.077617, 4.627326, -4.656667),
        (-14.077617, -4.627326, -4.656667),
    ]]
    add(f7_cavity, mode=Mode.SUBTRACT)


solid = f1_1.part
